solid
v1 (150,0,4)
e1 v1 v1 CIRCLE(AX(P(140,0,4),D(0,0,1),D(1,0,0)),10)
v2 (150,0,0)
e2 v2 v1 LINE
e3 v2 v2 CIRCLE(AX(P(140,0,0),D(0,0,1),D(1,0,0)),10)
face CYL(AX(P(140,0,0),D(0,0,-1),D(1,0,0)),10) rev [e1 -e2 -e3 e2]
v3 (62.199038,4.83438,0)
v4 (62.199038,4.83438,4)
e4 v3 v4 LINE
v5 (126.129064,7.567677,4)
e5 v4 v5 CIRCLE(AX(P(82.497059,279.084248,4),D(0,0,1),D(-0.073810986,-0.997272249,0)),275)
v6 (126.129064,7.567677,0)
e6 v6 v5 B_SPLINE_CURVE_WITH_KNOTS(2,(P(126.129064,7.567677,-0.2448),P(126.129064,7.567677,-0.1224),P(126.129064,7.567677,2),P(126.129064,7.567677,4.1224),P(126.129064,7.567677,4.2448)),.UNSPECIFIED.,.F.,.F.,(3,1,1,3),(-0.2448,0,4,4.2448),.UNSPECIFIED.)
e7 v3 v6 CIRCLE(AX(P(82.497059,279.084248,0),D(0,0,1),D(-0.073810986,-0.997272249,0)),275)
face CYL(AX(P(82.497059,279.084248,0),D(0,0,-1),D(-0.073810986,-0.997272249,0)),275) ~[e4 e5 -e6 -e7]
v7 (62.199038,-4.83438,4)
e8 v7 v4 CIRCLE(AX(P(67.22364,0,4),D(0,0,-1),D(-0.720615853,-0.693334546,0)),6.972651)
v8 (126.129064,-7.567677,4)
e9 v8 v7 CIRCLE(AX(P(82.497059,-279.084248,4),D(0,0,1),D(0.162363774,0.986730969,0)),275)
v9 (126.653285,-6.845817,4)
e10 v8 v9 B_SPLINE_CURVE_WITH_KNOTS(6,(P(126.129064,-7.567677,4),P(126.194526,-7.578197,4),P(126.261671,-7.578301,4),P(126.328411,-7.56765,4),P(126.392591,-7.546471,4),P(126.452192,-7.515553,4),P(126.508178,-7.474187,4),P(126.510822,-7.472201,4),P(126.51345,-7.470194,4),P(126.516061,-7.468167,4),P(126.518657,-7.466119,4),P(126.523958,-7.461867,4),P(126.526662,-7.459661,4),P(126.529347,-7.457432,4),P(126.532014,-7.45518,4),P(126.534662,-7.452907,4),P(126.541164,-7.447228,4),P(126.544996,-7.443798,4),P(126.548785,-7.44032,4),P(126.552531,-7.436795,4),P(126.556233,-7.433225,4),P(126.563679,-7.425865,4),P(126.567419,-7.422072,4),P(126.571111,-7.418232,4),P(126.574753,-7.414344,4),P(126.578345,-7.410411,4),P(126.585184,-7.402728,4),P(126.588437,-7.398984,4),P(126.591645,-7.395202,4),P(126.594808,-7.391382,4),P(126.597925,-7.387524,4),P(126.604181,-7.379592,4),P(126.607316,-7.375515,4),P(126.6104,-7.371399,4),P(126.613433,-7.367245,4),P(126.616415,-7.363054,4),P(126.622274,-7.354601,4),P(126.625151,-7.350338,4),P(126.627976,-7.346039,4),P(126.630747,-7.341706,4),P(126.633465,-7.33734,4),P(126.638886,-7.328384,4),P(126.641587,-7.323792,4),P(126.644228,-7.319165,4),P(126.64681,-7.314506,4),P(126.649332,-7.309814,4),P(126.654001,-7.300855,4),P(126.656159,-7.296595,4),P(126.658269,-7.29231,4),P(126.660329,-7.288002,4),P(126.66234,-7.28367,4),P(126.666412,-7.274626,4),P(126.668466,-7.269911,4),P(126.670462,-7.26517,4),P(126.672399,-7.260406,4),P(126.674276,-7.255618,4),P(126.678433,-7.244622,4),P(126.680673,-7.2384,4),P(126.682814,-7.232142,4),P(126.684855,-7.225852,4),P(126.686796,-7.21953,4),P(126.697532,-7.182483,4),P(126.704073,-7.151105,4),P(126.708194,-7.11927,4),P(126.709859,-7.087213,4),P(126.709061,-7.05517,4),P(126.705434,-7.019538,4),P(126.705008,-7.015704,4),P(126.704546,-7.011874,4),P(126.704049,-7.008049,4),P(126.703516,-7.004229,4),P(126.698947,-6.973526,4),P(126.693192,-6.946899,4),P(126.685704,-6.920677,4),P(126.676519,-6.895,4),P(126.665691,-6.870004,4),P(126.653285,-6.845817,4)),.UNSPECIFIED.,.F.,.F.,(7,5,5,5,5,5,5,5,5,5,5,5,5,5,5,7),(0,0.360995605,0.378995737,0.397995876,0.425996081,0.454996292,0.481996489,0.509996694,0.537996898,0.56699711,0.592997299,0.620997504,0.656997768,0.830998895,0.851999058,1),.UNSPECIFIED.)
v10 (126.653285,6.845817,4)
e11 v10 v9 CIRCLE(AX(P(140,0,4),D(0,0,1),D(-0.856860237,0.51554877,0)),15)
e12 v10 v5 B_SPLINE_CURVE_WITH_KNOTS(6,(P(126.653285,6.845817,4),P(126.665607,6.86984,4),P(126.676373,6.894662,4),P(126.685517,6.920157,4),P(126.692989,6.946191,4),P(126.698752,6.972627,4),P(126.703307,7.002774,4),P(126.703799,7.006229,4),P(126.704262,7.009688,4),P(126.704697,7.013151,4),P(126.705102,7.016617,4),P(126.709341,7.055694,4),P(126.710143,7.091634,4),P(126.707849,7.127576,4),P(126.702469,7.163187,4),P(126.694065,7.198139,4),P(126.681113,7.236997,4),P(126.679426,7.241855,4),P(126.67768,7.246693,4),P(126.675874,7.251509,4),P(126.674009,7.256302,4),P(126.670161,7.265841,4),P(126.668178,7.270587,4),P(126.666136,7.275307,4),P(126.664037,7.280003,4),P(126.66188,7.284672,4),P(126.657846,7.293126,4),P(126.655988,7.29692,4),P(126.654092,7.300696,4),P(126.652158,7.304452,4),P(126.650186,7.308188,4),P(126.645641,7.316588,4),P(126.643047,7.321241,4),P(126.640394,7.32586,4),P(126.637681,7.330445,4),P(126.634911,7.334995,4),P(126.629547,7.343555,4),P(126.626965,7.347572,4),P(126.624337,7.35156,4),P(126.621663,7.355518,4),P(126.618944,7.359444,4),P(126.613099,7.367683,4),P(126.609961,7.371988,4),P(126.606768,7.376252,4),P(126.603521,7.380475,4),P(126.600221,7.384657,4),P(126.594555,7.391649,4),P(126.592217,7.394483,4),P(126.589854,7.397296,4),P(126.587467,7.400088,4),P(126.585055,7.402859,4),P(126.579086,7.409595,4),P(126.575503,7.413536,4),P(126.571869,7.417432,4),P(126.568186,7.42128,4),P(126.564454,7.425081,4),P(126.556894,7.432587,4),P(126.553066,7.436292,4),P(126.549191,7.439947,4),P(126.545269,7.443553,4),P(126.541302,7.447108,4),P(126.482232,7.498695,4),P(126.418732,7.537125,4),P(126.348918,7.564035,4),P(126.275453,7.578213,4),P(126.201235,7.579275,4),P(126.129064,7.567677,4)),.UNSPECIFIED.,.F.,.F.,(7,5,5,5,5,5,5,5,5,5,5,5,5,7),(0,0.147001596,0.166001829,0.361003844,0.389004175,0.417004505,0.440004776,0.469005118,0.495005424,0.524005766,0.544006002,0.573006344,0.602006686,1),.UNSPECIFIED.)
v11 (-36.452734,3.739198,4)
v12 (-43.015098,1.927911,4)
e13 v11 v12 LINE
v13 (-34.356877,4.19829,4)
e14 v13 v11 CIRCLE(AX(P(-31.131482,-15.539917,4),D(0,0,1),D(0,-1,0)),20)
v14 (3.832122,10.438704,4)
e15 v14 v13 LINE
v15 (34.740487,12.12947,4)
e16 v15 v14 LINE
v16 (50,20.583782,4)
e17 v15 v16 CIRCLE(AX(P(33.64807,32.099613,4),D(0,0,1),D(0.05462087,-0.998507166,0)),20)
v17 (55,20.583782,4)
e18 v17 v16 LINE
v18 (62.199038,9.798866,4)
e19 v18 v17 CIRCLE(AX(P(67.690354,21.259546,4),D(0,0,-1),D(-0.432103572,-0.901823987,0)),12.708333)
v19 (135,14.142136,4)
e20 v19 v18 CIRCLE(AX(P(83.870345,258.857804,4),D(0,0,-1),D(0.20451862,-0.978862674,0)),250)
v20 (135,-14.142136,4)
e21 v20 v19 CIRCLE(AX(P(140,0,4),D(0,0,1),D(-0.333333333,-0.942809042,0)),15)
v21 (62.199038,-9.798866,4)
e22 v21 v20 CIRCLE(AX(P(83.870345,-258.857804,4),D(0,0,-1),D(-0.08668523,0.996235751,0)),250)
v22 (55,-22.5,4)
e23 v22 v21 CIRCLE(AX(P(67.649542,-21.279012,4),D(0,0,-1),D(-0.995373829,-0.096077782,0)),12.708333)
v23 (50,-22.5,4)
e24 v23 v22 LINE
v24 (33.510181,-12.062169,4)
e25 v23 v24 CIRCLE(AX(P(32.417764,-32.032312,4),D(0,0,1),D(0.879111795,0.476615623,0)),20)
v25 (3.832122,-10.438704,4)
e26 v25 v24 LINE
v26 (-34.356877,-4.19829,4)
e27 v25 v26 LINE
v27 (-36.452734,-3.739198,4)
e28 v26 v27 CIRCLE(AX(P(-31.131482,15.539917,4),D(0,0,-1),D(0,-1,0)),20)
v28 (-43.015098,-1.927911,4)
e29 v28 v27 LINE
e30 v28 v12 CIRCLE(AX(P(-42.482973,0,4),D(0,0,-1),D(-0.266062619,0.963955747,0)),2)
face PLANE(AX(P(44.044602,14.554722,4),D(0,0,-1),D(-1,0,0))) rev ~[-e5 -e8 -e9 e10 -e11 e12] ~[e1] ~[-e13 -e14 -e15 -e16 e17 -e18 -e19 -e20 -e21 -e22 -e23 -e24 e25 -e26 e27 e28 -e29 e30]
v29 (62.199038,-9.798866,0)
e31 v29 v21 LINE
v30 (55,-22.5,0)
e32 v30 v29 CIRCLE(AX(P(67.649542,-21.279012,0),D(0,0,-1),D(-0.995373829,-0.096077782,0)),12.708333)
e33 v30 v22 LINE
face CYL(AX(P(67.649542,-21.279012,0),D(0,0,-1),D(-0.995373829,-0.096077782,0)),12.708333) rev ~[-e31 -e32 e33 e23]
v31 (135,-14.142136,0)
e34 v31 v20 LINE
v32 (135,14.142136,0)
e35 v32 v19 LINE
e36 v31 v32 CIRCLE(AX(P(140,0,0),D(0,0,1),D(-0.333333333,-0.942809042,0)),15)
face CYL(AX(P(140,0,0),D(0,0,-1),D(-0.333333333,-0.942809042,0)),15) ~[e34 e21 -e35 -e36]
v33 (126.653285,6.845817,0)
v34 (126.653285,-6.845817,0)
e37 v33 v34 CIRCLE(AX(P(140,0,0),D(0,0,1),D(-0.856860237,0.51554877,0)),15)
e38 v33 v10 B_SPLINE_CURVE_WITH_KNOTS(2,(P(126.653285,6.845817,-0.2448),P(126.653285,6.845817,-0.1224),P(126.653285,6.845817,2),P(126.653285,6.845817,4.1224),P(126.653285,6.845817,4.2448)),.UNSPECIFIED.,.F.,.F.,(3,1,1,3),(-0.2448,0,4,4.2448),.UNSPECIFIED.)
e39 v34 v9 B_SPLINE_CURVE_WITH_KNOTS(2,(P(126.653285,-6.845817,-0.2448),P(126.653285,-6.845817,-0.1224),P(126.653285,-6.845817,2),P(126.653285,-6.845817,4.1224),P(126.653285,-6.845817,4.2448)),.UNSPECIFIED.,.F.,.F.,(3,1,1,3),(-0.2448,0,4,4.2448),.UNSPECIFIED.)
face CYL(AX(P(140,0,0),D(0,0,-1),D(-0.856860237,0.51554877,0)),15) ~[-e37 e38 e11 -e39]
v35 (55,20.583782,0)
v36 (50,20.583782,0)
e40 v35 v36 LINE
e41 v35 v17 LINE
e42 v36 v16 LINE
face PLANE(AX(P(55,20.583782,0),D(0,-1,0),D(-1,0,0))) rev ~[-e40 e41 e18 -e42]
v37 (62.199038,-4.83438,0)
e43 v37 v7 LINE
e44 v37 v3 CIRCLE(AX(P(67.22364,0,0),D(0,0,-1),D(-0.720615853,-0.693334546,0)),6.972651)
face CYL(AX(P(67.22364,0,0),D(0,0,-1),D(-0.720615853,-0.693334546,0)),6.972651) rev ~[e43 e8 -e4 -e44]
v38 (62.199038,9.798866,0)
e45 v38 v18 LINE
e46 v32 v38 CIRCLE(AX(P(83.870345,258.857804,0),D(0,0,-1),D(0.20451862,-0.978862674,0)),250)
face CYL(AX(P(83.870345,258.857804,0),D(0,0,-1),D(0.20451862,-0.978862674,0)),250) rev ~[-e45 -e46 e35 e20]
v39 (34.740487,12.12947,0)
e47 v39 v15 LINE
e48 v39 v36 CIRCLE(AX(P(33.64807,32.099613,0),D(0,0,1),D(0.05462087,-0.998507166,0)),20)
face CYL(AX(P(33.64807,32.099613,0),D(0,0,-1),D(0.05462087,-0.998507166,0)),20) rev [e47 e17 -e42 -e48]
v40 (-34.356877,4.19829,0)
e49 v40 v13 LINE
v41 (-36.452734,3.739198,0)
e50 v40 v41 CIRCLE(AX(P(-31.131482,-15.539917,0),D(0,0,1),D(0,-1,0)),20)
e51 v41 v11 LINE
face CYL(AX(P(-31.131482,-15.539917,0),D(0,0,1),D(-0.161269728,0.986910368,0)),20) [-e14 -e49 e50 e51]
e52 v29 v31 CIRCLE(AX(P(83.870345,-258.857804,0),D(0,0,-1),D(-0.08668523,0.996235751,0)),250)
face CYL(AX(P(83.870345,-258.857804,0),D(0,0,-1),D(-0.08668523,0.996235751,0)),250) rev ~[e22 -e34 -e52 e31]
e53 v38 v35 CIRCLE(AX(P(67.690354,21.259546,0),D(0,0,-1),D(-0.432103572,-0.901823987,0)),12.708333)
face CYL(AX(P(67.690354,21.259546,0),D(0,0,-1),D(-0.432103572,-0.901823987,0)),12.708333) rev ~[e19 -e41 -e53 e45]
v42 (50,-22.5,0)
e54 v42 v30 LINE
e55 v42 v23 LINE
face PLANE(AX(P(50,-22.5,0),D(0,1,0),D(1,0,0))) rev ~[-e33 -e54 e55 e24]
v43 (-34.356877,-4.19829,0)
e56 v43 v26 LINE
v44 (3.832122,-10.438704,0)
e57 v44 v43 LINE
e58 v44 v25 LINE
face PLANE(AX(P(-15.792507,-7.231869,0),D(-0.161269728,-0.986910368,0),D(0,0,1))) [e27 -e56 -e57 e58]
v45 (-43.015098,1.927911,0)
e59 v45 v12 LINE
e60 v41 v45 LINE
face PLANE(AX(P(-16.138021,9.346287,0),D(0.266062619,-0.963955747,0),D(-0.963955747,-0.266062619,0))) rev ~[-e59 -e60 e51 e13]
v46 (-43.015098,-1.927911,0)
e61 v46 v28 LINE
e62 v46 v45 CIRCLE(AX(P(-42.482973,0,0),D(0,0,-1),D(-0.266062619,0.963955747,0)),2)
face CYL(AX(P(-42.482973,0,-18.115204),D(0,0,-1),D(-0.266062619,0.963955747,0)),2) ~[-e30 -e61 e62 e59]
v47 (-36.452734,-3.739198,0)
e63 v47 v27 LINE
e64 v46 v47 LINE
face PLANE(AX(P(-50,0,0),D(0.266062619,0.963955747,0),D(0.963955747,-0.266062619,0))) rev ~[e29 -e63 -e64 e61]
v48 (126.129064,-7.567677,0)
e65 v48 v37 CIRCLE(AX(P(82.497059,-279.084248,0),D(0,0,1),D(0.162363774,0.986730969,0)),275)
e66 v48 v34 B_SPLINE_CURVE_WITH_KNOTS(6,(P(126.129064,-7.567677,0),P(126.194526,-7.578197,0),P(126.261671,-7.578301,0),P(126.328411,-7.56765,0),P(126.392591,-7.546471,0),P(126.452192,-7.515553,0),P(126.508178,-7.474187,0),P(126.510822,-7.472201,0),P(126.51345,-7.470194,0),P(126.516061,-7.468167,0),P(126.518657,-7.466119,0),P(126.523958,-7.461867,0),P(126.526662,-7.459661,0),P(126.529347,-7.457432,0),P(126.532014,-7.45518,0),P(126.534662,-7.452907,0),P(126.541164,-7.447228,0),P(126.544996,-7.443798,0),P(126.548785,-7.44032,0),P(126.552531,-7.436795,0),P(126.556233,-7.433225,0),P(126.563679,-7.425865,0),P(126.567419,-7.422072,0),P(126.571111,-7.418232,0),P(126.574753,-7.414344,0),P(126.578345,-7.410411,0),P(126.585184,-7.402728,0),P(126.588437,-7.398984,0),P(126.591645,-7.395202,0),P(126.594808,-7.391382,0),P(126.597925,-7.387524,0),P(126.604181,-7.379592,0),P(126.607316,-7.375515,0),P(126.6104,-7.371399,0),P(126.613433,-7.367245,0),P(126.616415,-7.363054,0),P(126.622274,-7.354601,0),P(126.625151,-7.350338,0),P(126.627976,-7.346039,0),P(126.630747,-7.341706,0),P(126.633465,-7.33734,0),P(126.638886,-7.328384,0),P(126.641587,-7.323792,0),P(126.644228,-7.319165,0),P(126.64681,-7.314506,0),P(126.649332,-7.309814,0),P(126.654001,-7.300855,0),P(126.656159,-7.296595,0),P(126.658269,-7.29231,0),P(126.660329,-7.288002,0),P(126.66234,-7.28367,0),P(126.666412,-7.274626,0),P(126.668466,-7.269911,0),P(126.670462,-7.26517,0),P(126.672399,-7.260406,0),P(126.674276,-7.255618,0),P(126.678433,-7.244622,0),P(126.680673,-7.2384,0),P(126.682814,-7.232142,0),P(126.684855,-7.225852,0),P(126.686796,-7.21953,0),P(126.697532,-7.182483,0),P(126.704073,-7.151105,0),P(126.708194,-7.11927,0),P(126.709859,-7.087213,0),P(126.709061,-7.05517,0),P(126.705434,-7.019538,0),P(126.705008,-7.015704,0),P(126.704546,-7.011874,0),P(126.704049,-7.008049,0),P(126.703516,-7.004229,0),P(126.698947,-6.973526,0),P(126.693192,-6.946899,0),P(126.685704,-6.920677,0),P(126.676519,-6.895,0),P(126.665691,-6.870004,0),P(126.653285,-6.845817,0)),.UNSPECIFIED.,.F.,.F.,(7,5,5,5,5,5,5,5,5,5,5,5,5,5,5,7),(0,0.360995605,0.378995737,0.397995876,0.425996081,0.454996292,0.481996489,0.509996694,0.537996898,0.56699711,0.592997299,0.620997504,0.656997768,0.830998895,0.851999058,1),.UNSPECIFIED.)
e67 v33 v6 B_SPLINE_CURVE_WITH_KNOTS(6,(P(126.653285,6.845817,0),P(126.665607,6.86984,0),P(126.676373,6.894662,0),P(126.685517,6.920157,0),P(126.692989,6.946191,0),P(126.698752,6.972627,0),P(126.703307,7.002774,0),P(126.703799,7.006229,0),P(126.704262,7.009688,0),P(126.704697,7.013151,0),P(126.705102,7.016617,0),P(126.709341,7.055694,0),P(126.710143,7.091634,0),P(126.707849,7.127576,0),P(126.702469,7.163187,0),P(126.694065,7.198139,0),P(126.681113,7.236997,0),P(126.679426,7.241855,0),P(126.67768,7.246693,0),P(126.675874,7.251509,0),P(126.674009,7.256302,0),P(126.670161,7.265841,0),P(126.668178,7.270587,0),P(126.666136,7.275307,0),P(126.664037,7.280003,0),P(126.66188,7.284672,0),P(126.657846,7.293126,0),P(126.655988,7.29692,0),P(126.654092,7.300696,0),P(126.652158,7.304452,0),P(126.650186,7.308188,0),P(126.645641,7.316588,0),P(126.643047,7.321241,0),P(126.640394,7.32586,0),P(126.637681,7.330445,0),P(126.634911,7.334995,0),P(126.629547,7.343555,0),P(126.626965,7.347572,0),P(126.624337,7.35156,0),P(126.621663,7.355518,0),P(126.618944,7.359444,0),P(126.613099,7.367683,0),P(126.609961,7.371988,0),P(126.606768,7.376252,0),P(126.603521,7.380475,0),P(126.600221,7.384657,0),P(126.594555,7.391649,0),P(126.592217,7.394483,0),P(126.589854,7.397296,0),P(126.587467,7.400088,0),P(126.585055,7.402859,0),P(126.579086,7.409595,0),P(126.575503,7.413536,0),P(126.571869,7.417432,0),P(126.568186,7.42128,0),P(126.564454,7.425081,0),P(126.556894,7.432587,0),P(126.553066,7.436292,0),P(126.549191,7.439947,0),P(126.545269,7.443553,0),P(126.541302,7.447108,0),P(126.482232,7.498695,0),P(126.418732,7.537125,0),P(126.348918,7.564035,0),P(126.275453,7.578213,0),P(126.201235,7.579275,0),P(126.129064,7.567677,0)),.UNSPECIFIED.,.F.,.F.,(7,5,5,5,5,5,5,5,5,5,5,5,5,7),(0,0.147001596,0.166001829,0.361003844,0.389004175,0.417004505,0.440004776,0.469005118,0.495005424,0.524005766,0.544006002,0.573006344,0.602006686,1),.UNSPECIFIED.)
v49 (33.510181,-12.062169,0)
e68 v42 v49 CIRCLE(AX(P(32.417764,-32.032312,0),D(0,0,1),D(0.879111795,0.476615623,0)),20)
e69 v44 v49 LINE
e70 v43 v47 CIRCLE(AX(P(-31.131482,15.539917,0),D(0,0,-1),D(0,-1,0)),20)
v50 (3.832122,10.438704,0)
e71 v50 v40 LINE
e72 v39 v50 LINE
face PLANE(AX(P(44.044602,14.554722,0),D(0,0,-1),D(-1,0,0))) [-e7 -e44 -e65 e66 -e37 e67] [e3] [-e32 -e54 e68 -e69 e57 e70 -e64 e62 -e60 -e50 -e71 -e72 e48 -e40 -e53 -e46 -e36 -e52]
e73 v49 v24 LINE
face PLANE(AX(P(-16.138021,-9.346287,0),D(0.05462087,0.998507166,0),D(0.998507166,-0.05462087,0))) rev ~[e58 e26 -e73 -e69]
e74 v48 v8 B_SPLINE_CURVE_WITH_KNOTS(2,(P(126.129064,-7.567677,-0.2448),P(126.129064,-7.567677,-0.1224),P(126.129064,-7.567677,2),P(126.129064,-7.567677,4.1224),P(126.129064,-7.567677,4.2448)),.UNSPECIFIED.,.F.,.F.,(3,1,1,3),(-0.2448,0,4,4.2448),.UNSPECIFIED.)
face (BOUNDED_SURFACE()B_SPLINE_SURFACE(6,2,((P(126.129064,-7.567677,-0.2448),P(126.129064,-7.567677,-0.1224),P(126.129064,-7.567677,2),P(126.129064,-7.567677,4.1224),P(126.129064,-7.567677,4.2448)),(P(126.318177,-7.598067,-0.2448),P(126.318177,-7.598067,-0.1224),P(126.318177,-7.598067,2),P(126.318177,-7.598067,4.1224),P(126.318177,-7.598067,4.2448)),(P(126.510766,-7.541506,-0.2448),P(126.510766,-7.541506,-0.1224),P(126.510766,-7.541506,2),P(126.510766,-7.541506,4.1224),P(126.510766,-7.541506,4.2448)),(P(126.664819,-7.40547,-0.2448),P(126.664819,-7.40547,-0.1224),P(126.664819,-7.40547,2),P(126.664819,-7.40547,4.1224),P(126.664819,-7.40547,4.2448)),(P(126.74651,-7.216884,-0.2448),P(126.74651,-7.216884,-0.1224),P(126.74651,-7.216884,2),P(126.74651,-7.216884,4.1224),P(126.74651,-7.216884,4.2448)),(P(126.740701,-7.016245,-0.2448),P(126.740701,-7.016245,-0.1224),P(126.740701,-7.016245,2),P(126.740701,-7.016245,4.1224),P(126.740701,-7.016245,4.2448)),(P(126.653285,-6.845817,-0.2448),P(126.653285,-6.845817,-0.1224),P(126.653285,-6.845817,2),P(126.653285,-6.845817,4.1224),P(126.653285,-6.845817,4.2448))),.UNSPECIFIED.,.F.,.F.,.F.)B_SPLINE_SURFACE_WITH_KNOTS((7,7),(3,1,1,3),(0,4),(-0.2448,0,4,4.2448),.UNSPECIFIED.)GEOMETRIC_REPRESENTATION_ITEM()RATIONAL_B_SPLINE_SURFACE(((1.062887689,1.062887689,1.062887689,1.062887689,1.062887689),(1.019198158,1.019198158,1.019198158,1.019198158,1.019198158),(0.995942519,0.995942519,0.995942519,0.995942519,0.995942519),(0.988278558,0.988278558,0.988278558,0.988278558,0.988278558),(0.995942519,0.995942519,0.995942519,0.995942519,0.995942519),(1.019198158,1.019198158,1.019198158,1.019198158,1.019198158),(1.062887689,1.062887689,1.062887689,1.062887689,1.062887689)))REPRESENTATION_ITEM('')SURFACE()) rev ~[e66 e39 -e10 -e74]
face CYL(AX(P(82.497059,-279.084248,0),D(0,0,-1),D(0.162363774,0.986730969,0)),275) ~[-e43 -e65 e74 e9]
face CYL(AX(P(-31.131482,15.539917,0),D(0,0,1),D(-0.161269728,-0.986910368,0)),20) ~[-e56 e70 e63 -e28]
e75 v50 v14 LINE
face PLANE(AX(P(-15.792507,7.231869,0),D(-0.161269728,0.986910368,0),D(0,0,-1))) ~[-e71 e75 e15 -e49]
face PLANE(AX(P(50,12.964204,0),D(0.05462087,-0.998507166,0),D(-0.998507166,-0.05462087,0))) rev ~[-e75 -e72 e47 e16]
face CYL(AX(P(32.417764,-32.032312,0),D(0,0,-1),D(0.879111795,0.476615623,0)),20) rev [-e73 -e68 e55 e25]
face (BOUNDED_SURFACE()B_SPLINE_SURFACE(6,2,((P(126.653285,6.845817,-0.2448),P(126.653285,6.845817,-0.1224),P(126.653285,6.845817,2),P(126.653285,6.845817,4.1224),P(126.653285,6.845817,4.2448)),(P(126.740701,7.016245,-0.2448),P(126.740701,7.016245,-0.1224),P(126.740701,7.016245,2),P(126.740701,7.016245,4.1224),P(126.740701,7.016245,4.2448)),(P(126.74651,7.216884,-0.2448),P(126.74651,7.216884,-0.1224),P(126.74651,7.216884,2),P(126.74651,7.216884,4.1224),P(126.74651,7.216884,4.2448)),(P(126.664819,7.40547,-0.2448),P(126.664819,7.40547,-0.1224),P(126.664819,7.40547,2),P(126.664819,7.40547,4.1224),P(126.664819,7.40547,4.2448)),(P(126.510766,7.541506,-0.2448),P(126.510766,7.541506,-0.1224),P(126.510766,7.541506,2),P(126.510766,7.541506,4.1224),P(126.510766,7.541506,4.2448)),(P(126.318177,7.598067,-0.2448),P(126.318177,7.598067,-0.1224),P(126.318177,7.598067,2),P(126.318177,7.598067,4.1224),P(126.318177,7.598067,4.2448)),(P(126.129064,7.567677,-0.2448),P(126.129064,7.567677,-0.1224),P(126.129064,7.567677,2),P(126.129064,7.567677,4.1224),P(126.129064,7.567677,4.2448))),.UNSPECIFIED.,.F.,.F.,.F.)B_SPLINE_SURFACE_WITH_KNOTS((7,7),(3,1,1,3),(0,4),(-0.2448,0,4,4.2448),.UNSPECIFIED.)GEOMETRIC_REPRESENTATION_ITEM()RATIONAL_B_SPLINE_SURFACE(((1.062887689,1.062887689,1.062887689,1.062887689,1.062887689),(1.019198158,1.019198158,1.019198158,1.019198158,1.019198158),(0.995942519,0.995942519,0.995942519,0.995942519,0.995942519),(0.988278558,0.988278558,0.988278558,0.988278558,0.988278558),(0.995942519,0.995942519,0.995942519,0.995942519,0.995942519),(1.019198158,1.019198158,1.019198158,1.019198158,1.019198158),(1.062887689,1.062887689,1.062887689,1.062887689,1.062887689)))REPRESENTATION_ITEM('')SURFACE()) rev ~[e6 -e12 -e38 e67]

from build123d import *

# Parameters (mm, degrees)
F0_R        = 10
F1_DEPTH    = 4
F2_R        = 0.5
F3_T1_DEPTH = 40.2304088715
F4_T1_DEPTH = 4
F5_SIZE     = 20
F6_R        = 20


# Not quite as in the source:
# - a fillet or chamfer that OpenCascade refuses, or shapes differently, is made with other operations: its cross-section is extruded or revolved along the edge and cut away or added


with BuildPart() as f1:
    # F0 (on Top) → F1 (new body)
    with BuildSketch(Plane.XY):
        with BuildLine():
            Line((50, 20.5837816147), (50, 12.9642039537))
            Line((50, 12.9642039537), (-16.1380209029, 9.3462867662))
            Line((-16.1380209029, 9.3462867662), (-50, 0))
            Line((-50, 0), (-16.1380209029, -9.3462867662))
            Line((-16.1380209029, -9.3462867662), (50, -12.9642039537))
            Line((50, -12.9642039537), (50, -22.5))
            Line((50, -22.5), (55, -22.5))
            ThreePointArc((55, -22.5), (56.5936558821, -15.0125045804), (62.1990375221, -9.7988663689))
            ThreePointArc((62.1990375221, -9.7988663689), (98.7587484272, -9.3015269429), (135, -14.1421356237))
            ThreePointArc((135, -14.1421356237), (155, 0), (135, 14.1421356237))
            ThreePointArc((135, 14.1421356237), (98.7587484272, 9.3015269429), (62.1990375221, 9.7988663689))
            ThreePointArc((62.1990375221, 9.7988663689), (57.1204966078, 14.2040620862), (55, 20.5837816147))
            Line((55, 20.5837816147), (50, 20.5837816147))
        make_face()
        with BuildLine():
            ThreePointArc((62.1990375221, -4.8343795659), (60.2509894701, 0), (62.1990375221, 4.8343795659))
            ThreePointArc((62.1990375221, 4.8343795659), (94.7590329876, 4.3577585856), (127.1470964452, 7.7332315503))
            ThreePointArc((127.1470964452, 7.7332315503), (125, 0), (127.1470964452, -7.7332315503))
            ThreePointArc((127.1470964452, -7.7332315503), (94.7590329876, -4.3577585856), (62.1990375221, -4.8343795659))
        make_face(mode=Mode.SUBTRACT)
        with Locations((140, 0)):
            Circle(F0_R, mode=Mode.SUBTRACT)
    extrude(amount=F1_DEPTH)

    # F2
    f2_edges = [f1.edges().sort_by_distance(p)[0] for p in [
        (127.147096, 7.733232, 2),
        (127.147096, -7.733232, 2),
    ]]
    fillet(f2_edges, radius=F2_R)

    # F3: fillet of radius 2 on 1 edges, made by hand

    # F3_s2 → F3_t1 (cut)
    with BuildSketch(Plane.XY.offset(-18.1152044358)):
        with BuildLine():
            ThreePointArc((-43.0150978282, 1.9279114946), (-44.4829725902, 0), (-43.0150978282, -1.9279114946))
            Line((-43.0150978282, -1.9279114946), (-50, 0))
            Line((-50, 0), (-43.0150978282, 1.9279114946))
        make_face()
    extrude(amount=F3_T1_DEPTH, mode=Mode.SUBTRACT)

    # F4: fillet of radius 20 on 2 edges, made by hand

    # F4_s2 → F4_t1 (join)
    with BuildSketch(Plane.XY):
        with BuildLine():
            ThreePointArc((34.7404872131, 12.1294699712), (43.3406010629, 14.6051902372), (50, 20.5837816147))
            Line((50, 20.5837816147), (50, 12.9642039537))
            Line((50, 12.9642039537), (34.7404872131, 12.1294699712))
        make_face()
        with BuildLine():
            ThreePointArc((50, -22.5), (43.1146209861, -15.1332813357), (33.5101814977, -12.0621691338))
            Line((33.5101814977, -12.0621691338), (50, -12.9642039537))
            Line((50, -12.9642039537), (50, -22.5))
        make_face()
    extrude(amount=F4_T1_DEPTH)

    # F5
    f5_edges = [f1.edges().sort_by_distance(p)[0] for p in [
        (-16.138021, -9.346287, 2),
        (-16.138021, 9.346287, 2),
    ]]
    chamfer(f5_edges, length=F5_SIZE)

    # F6
    f6_edges = [f1.edges().sort_by_distance(p)[0] for p in [
        (-35.417136, 4.025034, 2),
        (-35.417136, -4.025034, 2),
    ]]
    fillet(f6_edges, radius=F6_R)


solid = f1.part
